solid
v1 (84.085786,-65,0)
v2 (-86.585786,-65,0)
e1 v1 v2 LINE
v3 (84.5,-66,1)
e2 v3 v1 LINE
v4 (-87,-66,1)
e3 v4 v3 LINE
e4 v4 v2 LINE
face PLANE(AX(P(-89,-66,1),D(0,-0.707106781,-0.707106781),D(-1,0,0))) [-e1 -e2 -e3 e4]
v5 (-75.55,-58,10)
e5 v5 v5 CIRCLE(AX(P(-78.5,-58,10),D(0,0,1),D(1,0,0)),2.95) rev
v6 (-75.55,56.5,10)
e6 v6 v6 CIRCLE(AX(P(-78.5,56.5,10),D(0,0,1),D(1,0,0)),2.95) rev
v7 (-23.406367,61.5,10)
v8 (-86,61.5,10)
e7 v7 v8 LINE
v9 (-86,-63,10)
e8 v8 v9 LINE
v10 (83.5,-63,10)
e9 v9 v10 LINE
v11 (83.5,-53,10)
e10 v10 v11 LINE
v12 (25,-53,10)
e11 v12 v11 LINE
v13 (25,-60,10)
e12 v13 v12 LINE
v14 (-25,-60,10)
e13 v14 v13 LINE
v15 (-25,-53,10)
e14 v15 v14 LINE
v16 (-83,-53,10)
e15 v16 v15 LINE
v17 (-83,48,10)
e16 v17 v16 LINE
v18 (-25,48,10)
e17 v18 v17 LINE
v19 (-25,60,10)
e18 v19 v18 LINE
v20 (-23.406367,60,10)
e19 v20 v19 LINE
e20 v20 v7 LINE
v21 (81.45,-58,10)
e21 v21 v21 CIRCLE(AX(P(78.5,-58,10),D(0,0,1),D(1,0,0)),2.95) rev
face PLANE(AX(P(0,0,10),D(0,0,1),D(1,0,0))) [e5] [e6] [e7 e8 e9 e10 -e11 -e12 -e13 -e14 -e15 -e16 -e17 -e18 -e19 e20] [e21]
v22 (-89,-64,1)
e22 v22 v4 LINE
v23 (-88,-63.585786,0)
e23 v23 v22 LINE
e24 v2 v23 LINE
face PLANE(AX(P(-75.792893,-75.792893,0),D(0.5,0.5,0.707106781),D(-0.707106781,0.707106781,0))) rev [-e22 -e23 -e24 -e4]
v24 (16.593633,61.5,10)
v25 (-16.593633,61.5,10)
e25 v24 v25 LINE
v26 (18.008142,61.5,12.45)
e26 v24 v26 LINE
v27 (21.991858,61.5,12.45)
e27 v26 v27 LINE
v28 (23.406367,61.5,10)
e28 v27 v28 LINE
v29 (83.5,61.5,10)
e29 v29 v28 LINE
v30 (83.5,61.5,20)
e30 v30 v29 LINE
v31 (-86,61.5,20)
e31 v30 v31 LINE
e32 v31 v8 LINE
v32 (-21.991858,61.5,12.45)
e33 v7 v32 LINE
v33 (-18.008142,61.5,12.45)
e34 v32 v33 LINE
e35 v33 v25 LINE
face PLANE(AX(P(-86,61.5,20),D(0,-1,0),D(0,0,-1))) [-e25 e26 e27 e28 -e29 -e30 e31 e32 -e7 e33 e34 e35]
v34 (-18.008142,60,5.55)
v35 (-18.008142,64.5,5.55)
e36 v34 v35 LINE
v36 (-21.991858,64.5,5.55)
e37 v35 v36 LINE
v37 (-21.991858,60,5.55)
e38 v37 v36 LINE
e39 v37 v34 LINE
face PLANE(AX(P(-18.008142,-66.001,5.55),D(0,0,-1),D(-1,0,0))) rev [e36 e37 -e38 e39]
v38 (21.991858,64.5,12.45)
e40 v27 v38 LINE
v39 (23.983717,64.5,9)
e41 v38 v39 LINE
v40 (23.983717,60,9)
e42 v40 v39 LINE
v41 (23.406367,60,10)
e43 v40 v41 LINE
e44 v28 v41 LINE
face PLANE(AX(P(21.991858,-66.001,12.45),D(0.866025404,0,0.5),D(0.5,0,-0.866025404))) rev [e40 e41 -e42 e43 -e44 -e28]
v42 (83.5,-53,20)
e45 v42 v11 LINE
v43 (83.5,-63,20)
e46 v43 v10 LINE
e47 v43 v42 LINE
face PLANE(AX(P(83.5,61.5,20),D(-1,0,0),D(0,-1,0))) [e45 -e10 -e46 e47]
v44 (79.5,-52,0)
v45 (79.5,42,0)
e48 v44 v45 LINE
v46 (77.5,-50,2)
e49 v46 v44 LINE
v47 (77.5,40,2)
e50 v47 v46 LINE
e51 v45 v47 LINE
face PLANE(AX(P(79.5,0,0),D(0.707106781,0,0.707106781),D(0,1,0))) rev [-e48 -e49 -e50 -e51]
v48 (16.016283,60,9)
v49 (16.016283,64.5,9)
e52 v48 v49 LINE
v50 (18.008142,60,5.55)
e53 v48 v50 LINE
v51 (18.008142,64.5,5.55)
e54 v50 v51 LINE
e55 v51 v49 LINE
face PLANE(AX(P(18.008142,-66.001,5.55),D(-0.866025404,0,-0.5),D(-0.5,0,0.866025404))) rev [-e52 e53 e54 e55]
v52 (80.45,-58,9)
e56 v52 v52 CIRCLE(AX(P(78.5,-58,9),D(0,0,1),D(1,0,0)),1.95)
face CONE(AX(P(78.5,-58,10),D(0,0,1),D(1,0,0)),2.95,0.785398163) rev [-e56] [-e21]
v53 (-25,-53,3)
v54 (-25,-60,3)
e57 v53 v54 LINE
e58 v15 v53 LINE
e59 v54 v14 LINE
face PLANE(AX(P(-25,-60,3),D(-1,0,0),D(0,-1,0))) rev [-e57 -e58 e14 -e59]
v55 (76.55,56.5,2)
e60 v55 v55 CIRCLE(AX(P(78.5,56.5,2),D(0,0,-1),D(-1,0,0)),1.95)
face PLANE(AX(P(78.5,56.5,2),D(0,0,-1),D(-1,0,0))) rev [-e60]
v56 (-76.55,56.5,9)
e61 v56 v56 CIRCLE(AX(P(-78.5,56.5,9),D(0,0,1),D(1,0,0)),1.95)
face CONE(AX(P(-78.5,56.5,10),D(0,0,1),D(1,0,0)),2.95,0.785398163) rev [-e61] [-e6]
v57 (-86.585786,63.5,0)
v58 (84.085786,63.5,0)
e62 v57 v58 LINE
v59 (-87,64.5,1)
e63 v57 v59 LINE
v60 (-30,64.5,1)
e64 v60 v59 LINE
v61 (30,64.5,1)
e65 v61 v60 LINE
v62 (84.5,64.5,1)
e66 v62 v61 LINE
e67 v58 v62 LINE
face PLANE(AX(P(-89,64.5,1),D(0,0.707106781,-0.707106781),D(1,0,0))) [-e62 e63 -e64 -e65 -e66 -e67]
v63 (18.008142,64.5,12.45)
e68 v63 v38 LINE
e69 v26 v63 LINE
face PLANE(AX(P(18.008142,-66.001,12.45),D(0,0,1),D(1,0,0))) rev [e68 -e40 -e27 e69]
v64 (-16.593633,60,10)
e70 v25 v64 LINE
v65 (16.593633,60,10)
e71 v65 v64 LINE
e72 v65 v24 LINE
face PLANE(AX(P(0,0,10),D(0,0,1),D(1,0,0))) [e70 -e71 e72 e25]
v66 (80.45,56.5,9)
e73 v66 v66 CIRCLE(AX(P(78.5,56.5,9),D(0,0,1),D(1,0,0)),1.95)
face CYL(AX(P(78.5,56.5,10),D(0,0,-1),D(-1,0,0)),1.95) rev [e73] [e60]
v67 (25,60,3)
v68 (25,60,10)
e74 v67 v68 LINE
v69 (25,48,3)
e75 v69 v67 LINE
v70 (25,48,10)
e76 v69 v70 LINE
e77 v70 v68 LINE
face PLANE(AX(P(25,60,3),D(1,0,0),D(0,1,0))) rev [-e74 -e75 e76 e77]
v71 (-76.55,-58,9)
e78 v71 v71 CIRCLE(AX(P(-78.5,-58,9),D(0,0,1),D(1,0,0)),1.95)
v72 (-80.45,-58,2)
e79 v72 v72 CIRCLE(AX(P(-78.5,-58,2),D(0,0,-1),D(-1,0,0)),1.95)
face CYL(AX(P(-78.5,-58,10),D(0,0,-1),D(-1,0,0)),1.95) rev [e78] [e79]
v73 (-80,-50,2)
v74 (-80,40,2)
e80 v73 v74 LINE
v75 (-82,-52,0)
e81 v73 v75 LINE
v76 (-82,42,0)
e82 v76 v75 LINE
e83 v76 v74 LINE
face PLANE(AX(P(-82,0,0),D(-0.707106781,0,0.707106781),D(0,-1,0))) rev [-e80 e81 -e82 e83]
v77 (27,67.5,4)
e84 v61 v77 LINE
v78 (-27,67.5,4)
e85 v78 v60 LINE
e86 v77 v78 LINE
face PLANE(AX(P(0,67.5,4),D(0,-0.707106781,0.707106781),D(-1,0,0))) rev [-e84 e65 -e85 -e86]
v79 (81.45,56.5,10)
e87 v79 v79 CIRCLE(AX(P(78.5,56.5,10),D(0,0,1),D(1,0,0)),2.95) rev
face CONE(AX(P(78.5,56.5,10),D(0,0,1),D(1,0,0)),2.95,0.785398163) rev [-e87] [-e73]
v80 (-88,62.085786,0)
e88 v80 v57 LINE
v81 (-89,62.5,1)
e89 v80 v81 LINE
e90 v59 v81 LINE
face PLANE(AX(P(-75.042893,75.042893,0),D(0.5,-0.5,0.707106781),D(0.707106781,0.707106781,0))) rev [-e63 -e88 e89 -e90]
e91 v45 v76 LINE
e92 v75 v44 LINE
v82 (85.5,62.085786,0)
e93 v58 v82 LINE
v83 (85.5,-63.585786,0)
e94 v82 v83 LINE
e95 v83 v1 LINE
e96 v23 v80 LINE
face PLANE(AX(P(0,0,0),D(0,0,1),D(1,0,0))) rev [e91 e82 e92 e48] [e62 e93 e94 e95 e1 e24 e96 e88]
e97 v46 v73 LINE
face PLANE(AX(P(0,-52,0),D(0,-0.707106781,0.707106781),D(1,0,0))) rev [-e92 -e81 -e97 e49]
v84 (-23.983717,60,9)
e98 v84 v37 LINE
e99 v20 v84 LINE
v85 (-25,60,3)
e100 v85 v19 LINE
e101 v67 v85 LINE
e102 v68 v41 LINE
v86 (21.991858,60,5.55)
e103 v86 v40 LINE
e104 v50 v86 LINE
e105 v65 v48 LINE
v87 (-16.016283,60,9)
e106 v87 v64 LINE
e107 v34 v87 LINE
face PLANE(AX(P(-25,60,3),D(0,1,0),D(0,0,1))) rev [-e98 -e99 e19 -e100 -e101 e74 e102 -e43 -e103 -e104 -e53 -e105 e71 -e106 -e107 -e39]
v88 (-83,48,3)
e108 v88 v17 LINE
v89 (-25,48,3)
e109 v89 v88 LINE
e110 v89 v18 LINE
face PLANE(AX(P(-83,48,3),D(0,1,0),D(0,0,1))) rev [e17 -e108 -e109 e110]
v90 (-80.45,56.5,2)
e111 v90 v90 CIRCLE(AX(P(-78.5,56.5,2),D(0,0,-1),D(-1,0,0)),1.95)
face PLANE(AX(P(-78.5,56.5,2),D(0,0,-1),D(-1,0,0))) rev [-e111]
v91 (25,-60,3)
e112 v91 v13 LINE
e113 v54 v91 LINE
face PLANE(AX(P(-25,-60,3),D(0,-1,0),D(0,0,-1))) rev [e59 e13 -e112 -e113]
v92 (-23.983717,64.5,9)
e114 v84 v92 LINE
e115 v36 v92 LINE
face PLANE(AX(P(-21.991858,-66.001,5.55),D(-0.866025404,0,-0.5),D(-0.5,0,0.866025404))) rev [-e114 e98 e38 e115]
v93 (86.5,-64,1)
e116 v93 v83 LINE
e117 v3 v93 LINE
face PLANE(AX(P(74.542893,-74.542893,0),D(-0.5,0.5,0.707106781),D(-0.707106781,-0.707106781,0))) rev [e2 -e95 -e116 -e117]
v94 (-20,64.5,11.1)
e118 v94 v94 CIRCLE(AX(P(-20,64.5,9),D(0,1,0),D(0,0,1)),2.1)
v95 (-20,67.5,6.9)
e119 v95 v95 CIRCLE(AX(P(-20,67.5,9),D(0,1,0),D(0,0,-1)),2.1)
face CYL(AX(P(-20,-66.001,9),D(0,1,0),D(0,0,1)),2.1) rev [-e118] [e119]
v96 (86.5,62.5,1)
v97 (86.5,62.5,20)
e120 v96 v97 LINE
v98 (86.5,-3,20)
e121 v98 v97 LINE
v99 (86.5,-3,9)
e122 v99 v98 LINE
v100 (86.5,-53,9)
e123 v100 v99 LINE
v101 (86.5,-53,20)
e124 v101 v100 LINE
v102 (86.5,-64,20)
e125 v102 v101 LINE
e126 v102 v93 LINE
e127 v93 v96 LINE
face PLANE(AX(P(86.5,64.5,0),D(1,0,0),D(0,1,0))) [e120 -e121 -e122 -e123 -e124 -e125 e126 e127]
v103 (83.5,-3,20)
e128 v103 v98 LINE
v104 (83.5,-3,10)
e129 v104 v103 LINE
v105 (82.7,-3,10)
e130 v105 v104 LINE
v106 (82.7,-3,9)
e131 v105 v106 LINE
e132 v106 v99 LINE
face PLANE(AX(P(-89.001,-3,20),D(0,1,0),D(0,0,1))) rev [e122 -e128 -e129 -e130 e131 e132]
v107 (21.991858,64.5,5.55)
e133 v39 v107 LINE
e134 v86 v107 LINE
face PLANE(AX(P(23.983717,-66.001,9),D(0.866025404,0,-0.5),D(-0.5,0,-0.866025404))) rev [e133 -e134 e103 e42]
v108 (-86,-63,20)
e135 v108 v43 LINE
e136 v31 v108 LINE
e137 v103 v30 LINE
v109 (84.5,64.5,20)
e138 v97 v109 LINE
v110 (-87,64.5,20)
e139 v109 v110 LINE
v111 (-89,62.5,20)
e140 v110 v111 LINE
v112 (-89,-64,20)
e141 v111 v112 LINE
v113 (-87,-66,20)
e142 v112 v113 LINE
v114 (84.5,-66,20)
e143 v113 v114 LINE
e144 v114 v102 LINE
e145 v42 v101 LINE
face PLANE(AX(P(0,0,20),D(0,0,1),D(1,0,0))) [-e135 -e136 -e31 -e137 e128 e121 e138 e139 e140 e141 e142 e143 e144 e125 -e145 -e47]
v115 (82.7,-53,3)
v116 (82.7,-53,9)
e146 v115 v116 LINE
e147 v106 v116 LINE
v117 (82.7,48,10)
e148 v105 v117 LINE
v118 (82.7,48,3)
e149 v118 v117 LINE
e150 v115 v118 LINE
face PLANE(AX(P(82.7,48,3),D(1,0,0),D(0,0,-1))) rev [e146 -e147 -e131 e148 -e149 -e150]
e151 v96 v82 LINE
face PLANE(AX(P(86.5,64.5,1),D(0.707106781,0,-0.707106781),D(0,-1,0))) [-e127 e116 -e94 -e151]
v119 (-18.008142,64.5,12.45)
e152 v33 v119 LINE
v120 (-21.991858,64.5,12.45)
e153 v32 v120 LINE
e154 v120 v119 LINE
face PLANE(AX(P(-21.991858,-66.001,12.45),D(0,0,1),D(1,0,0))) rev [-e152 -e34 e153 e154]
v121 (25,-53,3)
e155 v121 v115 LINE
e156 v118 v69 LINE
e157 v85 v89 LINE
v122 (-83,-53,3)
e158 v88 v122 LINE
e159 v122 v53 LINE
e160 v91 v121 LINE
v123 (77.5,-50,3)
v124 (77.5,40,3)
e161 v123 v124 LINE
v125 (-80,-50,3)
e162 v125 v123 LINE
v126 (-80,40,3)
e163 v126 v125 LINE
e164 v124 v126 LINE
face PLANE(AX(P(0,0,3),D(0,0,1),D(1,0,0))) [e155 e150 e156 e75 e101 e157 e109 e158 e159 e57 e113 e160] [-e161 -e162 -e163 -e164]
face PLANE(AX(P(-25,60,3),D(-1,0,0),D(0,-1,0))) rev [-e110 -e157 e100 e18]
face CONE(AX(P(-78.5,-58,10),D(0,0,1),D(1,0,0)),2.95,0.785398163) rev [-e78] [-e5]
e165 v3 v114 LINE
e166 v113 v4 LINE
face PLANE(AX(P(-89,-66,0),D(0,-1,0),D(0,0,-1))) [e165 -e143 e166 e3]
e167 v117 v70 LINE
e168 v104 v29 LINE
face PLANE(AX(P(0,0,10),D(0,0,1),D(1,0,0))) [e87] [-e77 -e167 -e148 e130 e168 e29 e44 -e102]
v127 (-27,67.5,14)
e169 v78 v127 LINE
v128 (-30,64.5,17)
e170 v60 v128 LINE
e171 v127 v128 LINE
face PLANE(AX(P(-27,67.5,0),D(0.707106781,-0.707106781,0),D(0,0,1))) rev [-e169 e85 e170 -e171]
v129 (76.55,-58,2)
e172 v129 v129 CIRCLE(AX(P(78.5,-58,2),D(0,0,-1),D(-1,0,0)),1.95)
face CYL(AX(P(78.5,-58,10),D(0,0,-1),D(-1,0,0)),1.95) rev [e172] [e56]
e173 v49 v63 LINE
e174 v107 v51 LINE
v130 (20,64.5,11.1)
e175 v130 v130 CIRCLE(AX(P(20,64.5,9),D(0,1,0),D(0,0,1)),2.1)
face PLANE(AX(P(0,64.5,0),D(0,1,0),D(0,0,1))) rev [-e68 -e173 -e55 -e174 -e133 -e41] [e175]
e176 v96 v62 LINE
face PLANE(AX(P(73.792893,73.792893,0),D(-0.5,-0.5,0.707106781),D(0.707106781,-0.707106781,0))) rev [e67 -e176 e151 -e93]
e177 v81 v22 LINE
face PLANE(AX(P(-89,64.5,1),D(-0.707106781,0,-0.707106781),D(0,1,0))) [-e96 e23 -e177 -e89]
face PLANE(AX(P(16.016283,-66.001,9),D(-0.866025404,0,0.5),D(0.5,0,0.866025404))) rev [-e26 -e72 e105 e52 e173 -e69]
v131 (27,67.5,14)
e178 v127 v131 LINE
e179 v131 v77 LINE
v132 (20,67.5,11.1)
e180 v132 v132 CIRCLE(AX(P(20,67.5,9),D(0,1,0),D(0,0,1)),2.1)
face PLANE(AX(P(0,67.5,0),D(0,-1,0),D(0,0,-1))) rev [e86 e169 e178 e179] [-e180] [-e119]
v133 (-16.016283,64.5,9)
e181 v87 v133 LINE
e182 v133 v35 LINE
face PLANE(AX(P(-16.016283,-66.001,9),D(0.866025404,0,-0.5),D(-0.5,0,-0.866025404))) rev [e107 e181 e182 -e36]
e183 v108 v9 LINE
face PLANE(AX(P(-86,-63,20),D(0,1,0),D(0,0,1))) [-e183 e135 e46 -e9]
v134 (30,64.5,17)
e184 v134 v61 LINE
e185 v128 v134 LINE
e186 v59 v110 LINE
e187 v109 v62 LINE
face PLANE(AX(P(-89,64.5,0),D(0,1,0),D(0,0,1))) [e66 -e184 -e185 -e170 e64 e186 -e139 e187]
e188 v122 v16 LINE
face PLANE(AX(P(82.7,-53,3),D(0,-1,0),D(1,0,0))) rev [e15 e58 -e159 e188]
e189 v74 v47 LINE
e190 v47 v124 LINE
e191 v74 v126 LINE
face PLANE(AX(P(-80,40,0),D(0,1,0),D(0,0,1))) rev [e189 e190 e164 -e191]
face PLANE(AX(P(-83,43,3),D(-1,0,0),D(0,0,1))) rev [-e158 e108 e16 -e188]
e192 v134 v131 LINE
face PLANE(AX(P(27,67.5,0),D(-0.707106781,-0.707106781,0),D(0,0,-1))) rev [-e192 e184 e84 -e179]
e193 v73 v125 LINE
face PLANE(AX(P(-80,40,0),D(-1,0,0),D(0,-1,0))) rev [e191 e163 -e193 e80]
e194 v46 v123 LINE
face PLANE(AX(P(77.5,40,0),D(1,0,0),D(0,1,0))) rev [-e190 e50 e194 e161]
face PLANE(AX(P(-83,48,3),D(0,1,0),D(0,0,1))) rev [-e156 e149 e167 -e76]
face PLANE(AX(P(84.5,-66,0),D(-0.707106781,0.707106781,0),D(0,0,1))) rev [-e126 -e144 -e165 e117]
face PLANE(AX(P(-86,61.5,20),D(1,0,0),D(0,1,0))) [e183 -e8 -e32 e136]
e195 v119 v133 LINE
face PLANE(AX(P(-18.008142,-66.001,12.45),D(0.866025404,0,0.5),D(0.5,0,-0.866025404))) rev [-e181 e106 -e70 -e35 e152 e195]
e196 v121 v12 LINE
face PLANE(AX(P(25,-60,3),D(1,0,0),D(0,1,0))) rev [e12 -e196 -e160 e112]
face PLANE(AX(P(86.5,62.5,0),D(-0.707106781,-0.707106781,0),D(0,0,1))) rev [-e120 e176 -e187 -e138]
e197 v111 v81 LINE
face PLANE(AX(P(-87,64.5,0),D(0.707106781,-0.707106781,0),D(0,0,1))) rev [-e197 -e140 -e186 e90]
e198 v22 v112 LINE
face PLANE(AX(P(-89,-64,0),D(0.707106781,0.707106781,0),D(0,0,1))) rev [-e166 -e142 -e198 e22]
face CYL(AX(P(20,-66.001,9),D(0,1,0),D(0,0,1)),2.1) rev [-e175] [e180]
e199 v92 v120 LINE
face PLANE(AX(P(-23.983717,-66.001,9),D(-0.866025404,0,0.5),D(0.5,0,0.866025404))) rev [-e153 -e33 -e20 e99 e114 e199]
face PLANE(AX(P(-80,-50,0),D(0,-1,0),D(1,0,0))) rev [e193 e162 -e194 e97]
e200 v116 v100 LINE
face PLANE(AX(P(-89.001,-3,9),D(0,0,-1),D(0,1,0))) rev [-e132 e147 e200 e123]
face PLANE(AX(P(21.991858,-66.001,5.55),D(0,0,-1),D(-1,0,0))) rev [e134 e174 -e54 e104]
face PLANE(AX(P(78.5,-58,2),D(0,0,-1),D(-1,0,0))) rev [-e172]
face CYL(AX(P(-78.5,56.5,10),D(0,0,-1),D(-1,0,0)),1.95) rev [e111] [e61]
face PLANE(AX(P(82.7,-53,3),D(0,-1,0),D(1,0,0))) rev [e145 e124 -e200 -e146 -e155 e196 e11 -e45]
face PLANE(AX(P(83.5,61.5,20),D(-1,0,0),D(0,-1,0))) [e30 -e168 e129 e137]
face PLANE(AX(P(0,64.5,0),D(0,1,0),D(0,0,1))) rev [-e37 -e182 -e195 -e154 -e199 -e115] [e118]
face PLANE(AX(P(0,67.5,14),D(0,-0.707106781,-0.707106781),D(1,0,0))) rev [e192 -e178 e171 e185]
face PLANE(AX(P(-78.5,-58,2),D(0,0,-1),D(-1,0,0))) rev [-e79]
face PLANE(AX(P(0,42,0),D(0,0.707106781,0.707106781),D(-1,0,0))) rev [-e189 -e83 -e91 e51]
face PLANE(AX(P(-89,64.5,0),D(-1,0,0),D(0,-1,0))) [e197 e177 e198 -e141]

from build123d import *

# Parameters (mm, degrees)
CROQUIS1_W              = 218
CROQUIS1_H              = 145
SALIENTE_EXTRUIR1_DEPTH = 10
CORTAR_EXTRUIR1_DEPTH   = 7
CROQUIS3_W              = 157.5
CROQUIS3_H              = 90
CORTAR_EXTRUIR2_DEPTH   = 132.096338622
CHAFL_N1_SIZE           = 2
CORTAR_EXTRUIR3_START   = -2
CROQUIS4_R              = 1.95
CORTAR_EXTRUIR3_DEPTH   = 130.290707973
CROQUIS5_W              = 50
CROQUIS5_H              = 12
CORTAR_EXTRUIR4_DEPTH   = 7
CHAFL_N3_SIZE           = 1
CROQUIS6_OUTSIDE_W      = 272.402
CROQUIS6_OUTSIDE_H      = 199.402
CROQUIS6_OUTSIDE_W_2    = 175.5
CROQUIS6_OUTSIDE_H_2    = 130.5
CORTAR_EXTRUIR5_DEPTH   = 132.290707973
CROQUIS7_W              = 175.5
CROQUIS7_H              = 130.5
CROQUIS7_W_2            = 169.5
CROQUIS7_H_2            = 124.5
SALIENTE_EXTRUIR2_DEPTH = 10
CHAFL_N4_SIZE           = 2
CHAFL_N5_SIZE           = 1
CORTAR_EXTRUIR6_REACH   = 190.564
CROQUIS8_W              = 11
CROQUIS8_H              = 50
CROQUIS9_W              = 60
CROQUIS9_H              = 16
SALIENTE_EXTRUIR3_DEPTH = 3
CHAFL_N6_SIZE           = 3
CORTAR_EXTRUIR7_REACH   = 163.689
CROQUIS10_R             = 2.1
CORTAR_EXTRUIR8_REACH   = 166.689
CORTAR_EXTRUIR8_START   = -3


with BuildPart() as part:
    # Croquis1 → Saliente-Extruir1 (new body)
    with BuildSketch(Plane.XY):
        Rectangle(CROQUIS1_W, CROQUIS1_H)
    extrude(amount=SALIENTE_EXTRUIR1_DEPTH)

    # Croquis2 → Cortar-Extruir1 (cut)
    with BuildSketch(Plane.XY.offset(10)):
        Polygon((-83, 43), (-83, 48), (82.7, 48), (82.7, -53), (80.5, -53), (-83, -53), align=None)
    extrude(amount=-CORTAR_EXTRUIR1_DEPTH, mode=Mode.SUBTRACT)

    # Croquis3 → Cortar-Extruir2 (cut, through all)
    with BuildSketch(Plane.XY.offset(3)):
        with Locations((-1.25, -5)):
            Rectangle(CROQUIS3_W, CROQUIS3_H)
    extrude(amount=-CORTAR_EXTRUIR2_DEPTH, mode=Mode.SUBTRACT)

    # Chaflán1
    chafl_n1_edges = [part.edges().sort_by_distance(p)[0] for p in [
        (-80, -5, 0),
        (-1.25, 40, 0),
        (77.5, -5, 0),
        (-1.25, -50, 0),
    ]]
    chamfer(chafl_n1_edges, length=CHAFL_N1_SIZE)

    # Croquis4 → Cortar-Extruir3 (cut, through all)
    with BuildSketch(Plane(origin=(0, 0, 0), x_dir=(-1, 0, 0), z_dir=(0, 0, -1)).offset(CORTAR_EXTRUIR3_START)):
        with Locations((-78.5, 56.5)):
            Circle(CROQUIS4_R)
        with Locations((78.5, 56.5)):
            Circle(CROQUIS4_R)
        with Locations((78.5, -58)):
            Circle(CROQUIS4_R)
        with Locations((-78.5, -58)):
            Circle(CROQUIS4_R)
    extrude(amount=-CORTAR_EXTRUIR3_DEPTH, mode=Mode.SUBTRACT)

    # Croquis5 → Cortar-Extruir4 (cut)
    with BuildSketch(Plane.XY.offset(10)):
        with Locations((0, 54)):
            Rectangle(CROQUIS5_W, CROQUIS5_H)
        with Locations((0, -54)):
            Rectangle(CROQUIS5_W, CROQUIS5_H)
    extrude(amount=-CORTAR_EXTRUIR4_DEPTH, mode=Mode.SUBTRACT)

    # Chaflán3
    chafl_n3_edges = [part.edges().sort_by_distance(p)[0] for p in [
        (80.45, -58, 10),
        (-76.55, -58, 10),
        (-76.55, 56.5, 10),
        (80.45, 56.5, 10),
    ]]
    chamfer(chafl_n3_edges, length=CHAFL_N3_SIZE)

    # Croquis6 outside → Cortar-Extruir5 (cut, through all)
    with BuildSketch(Plane.XY.offset(10)):
        Rectangle(CROQUIS6_OUTSIDE_W, CROQUIS6_OUTSIDE_H)
        with Locations((-1.25, -0.75)):
            Rectangle(CROQUIS6_OUTSIDE_W_2, CROQUIS6_OUTSIDE_H_2, mode=Mode.SUBTRACT)
    extrude(amount=-CORTAR_EXTRUIR5_DEPTH, mode=Mode.SUBTRACT)

    # Croquis7 → Saliente-Extruir2 (add)
    with BuildSketch(Plane.XY.offset(10)):
        with Locations((-1.25, -0.75)):
            Rectangle(CROQUIS7_W, CROQUIS7_H)
        with Locations((-1.25, -0.75)):
            Rectangle(CROQUIS7_W_2, CROQUIS7_H_2, mode=Mode.SUBTRACT)
    extrude(amount=SALIENTE_EXTRUIR2_DEPTH)

    # Chaflán4
    chafl_n4_edges = [part.edges().sort_by_distance(p)[0] for p in [
        (-89, 64.5, 10),
        (86.5, 64.5, 10),
        (86.5, -66, 10),
        (-89, -66, 10),
    ]]
    chamfer(chafl_n4_edges, length=CHAFL_N4_SIZE)

    # Chaflán5
    chafl_n5_edges = [part.edges().sort_by_distance(p)[0] for p in [
        (86.5, -0.75, 0),
        (-1.25, 64.5, 0),
        (-89, -0.75, 0),
        (-1.25, -66, 0),
        (-88, 63.5, 0),
        (-88, -65, 0),
        (85.5, -65, 0),
        (85.5, 63.5, 0),
    ]]
    chamfer(chafl_n5_edges, length=CHAFL_N5_SIZE)

    # Croquis8 → Cortar-Extruir6 (cut, up to next)
    with BuildSketch(Plane(origin=(86.5, 0, 0), x_dir=(0, 0, -1), z_dir=(1, 0, 0)), mode=Mode.PRIVATE) as cortar_extruir6_sk1:
        with Locations((-14.5, -28)):
            Rectangle(CROQUIS8_W, CROQUIS8_H)
    cortar_extruir6_tool1 = extrude(cortar_extruir6_sk1.sketch, amount=-CORTAR_EXTRUIR6_REACH, mode=Mode.PRIVATE) & part.part
    add(cortar_extruir6_tool1.solids().sort_by_distance((86.5, -28, 14.5))[0], mode=Mode.SUBTRACT)

    # Croquis9 → Saliente-Extruir3 (add)
    with BuildSketch(Plane(origin=(0, 64.5, 0), x_dir=(1, 0, 0), z_dir=(0, 1, 0))):
        with Locations((0, -9)):
            Rectangle(CROQUIS9_W, CROQUIS9_H)
    extrude(amount=SALIENTE_EXTRUIR3_DEPTH)

    # Chaflán6
    chafl_n6_edges = [part.edges().sort_by_distance(p)[0] for p in [
        (0, 67.5, 17),
        (-30, 67.5, 9),
        (0, 67.5, 1),
        (30, 67.5, 9),
    ]]
    chamfer(chafl_n6_edges, length=CHAFL_N6_SIZE - 0.0001)  # a hair under: the kernel refuses the full size

    # Croquis10 → Cortar-Extruir7 (cut, up to next)
    with BuildSketch(Plane(origin=(0, 67.5, 0), x_dir=(1, 0, 0), z_dir=(0, 1, 0)), mode=Mode.PRIVATE) as cortar_extruir7_sk1:
        with Locations(Location((20, -9, 0), (0, 0, 270))):
            Circle(CROQUIS10_R)
    cortar_extruir7_tool1 = extrude(cortar_extruir7_sk1.sketch, amount=-CORTAR_EXTRUIR7_REACH, mode=Mode.PRIVATE) & part.part
    # Croquis10 → Cortar-Extruir7 (cut, up to next)
    with BuildSketch(Plane(origin=(0, 67.5, 0), x_dir=(1, 0, 0), z_dir=(0, 1, 0)), mode=Mode.PRIVATE) as cortar_extruir7_sk2:
        with Locations(Location((-20, -9, 0), (0, 0, 208.436890149))):
            Circle(CROQUIS10_R)
    cortar_extruir7_tool2 = extrude(cortar_extruir7_sk2.sketch, amount=-CORTAR_EXTRUIR7_REACH, mode=Mode.PRIVATE) & part.part
    add(cortar_extruir7_tool1.solids().sort_by_distance((20, 67.5, 9))[0], mode=Mode.SUBTRACT)
    add(cortar_extruir7_tool2.solids().sort_by_distance((-20, 67.5, 9))[0], mode=Mode.SUBTRACT)

    # Croquis11 → Cortar-Extruir8 (cut, up to next)
    with BuildSketch(Plane(origin=(0, 67.5, 0), x_dir=(1, 0, 0), z_dir=(0, 1, 0)).offset(CORTAR_EXTRUIR8_START), mode=Mode.PRIVATE) as cortar_extruir8_sk1:
        Polygon((23.983716857, -9), (21.991858429, -5.55), (18.008141571, -5.55), (16.016283143, -9), (18.008141571, -12.45), (21.991858429, -12.45), align=None)
    cortar_extruir8_tool1 = extrude(cortar_extruir8_sk1.sketch, amount=-CORTAR_EXTRUIR8_REACH, mode=Mode.PRIVATE) & part.part
    # Croquis11 → Cortar-Extruir8 (cut, up to next)
    with BuildSketch(Plane(origin=(0, 67.5, 0), x_dir=(1, 0, 0), z_dir=(0, 1, 0)).offset(CORTAR_EXTRUIR8_START), mode=Mode.PRIVATE) as cortar_extruir8_sk2:
        Polygon((-16.016283143, -9), (-18.008141571, -5.55), (-21.991858429, -5.55), (-23.983716857, -9), (-21.991858429, -12.45), (-18.008141571, -12.45), align=None)
    cortar_extruir8_tool2 = extrude(cortar_extruir8_sk2.sketch, amount=-CORTAR_EXTRUIR8_REACH, mode=Mode.PRIVATE) & part.part
    add(cortar_extruir8_tool1.solids().sort_by_distance((20, 64.5, 9))[0], mode=Mode.SUBTRACT)
    add(cortar_extruir8_tool2.solids().sort_by_distance((-20, 64.5, 9))[0], mode=Mode.SUBTRACT)


solid = part.part
